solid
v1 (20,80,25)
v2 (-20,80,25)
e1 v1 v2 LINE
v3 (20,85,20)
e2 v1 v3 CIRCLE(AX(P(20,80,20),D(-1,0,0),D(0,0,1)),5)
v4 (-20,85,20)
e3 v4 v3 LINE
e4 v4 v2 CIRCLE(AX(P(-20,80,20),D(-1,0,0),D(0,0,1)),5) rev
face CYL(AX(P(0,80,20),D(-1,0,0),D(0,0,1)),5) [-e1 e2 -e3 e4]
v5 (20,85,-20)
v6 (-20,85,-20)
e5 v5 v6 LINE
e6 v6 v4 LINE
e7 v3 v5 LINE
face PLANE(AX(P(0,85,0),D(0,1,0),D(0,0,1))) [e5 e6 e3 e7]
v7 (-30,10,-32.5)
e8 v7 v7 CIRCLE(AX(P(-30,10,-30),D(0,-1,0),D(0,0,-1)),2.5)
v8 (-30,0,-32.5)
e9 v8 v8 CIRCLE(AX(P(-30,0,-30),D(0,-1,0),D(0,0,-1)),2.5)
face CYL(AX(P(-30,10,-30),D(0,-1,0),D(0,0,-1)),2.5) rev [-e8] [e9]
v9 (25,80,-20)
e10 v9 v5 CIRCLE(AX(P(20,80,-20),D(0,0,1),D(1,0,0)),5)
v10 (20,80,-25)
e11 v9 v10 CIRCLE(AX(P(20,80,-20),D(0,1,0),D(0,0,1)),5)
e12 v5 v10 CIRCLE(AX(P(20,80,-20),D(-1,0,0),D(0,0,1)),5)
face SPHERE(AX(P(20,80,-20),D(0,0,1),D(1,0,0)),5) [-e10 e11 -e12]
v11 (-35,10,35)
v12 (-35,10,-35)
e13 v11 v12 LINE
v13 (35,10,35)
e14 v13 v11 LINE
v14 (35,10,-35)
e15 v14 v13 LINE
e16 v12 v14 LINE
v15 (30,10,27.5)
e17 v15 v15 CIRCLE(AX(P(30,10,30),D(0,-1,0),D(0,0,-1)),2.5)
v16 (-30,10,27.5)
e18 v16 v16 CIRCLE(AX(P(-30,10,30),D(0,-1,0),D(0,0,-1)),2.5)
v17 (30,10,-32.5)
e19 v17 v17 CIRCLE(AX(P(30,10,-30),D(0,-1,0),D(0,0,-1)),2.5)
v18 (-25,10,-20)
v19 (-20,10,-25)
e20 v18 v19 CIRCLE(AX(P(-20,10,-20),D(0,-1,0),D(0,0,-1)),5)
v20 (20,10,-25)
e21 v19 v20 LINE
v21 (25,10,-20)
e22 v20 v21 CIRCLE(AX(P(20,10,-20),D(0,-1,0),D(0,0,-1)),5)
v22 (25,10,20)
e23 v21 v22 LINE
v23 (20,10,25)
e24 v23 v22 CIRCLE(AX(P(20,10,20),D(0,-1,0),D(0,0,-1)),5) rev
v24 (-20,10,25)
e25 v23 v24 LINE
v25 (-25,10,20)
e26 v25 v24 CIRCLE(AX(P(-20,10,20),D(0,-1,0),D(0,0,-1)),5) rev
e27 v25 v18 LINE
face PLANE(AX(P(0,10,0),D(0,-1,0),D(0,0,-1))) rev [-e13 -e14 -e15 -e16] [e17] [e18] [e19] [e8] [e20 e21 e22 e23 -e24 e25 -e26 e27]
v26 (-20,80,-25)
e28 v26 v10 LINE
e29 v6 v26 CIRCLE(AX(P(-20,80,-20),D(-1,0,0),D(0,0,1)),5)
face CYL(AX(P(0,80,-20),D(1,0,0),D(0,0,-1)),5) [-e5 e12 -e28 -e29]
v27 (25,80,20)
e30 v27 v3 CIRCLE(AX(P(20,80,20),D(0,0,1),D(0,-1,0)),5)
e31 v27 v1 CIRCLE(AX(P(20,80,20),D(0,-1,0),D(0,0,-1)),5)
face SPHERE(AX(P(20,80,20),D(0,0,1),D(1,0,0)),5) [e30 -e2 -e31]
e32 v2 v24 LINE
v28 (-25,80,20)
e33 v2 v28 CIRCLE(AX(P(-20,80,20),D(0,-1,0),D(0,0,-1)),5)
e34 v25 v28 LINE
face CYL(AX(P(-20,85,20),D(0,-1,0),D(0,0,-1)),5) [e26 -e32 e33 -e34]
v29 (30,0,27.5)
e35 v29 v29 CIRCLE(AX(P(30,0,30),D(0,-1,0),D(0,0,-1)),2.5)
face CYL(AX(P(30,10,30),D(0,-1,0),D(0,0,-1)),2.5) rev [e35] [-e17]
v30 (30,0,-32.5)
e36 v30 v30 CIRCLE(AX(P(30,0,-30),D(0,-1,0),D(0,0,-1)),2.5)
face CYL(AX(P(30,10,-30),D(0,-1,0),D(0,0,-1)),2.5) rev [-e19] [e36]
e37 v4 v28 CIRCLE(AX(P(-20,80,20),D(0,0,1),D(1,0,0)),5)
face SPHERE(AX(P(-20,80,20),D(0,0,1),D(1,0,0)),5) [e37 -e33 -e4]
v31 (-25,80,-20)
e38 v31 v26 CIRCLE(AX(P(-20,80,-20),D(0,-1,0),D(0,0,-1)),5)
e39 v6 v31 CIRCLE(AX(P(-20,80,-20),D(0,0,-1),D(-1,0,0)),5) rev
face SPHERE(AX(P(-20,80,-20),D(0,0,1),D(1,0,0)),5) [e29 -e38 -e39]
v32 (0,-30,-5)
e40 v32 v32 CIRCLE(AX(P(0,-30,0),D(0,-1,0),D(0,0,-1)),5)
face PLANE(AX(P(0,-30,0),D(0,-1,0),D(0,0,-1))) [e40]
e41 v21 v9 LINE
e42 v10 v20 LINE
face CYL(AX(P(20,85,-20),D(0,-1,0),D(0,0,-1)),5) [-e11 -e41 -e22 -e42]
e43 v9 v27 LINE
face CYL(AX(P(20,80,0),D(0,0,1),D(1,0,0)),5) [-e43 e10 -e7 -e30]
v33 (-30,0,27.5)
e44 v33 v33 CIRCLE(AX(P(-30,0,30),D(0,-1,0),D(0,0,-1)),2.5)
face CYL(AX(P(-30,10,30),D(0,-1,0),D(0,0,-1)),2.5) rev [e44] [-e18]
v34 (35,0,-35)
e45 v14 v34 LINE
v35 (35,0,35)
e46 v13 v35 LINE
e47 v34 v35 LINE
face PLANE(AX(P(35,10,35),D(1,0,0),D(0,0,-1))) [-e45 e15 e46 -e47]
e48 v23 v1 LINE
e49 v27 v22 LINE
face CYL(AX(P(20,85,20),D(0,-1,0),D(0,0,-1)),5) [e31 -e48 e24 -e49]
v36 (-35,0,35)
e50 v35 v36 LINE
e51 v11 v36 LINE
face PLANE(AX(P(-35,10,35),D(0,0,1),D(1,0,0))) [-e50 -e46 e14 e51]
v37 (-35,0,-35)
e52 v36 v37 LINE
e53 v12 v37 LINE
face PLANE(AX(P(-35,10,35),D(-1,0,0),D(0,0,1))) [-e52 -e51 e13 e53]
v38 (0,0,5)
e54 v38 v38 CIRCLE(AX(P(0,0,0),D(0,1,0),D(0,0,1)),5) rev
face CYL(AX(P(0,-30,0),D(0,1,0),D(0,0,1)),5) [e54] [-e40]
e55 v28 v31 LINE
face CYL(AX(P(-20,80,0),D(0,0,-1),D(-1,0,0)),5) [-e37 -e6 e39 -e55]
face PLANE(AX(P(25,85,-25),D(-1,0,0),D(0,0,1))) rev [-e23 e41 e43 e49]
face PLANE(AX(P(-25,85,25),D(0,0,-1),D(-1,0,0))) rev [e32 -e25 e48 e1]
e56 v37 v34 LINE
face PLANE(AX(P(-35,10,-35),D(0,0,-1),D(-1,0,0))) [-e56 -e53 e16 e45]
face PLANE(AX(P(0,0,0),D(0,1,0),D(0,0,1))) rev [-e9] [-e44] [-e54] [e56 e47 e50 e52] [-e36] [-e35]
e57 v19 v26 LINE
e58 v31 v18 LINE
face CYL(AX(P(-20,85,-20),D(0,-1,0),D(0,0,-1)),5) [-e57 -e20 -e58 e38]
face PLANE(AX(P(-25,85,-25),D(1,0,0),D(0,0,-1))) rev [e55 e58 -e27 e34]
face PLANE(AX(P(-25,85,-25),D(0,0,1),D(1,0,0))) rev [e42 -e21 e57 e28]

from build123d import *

# Parameters (mm, degrees)
SKETCH1_W           = 50
SKETCH1_H           = 50
BOSS_EXTRUDE1_DEPTH = 85
SKETCH2_R           = 5
BOSS_EXTRUDE2_DEPTH = 30
FILLET1_R           = 5
FILLET2_R           = 5
SKETCH3_W           = 70
SKETCH3_H           = 70
BOSS_EXTRUDE3_DEPTH = 10
FILLET3_R           = 5
SKETCH4_R           = 2.5
CUT_EXTRUDE1_DEPTH  = 10


with BuildPart() as part:
    # Sketch1 → Boss-Extrude1 (new body)
    with BuildSketch(Plane(origin=(0, 0, 0), x_dir=(1, 0, 0), z_dir=(0, 1, 0))):
        Rectangle(SKETCH1_W, SKETCH1_H)
    extrude(amount=BOSS_EXTRUDE1_DEPTH)

    # Sketch2 → Boss-Extrude2 (add)
    with BuildSketch(Plane.XZ):
        with Locations(Location((0, 0, 0), (0, 0, 90))):
            Circle(SKETCH2_R)
    extrude(amount=BOSS_EXTRUDE2_DEPTH)

    # Fillet1
    fillet1_edges = [part.edges().sort_by_distance(p)[0] for p in [
        (0, 85, 25),
        (0, 0, 25),
        (25, 42.5, 25),
        (-25, 42.5, 25),
    ]]
    fillet(fillet1_edges, radius=FILLET1_R)

    # Fillet2
    # the kernel refuses this fillet: 5 mm, written as the material it takes off along each edge
    with BuildSketch(Plane(origin=(-20, 80, 20), x_dir=(0, 1, 0), z_dir=(-1, 0, 0))) as fillet2_piece_1_section:
        Polygon((0, 0), (FILLET2_R, 0), (FILLET2_R, -FILLET2_R), (0, -FILLET2_R), align=None)
    fillet2_piece_1 = extrude(amount=FILLET2_R, mode=Mode.PRIVATE)
    fillet2_piece_1 = fillet2_piece_1 - Plane(origin=(-20, 80, 20), x_dir=(0, -0.7071067811865475, -0.7071067811865475), z_dir=(-1, 0, 0)) * Sphere(FILLET2_R, mode=Mode.PRIVATE)
    add(fillet2_piece_1, mode=Mode.SUBTRACT)
    with BuildSketch(Plane(origin=(20, 80, 20), x_dir=(1, 0, 0), z_dir=(0, 1, 0))) as fillet2_piece_2_section:
        Polygon((0, 0), (FILLET2_R, 0), (FILLET2_R, -FILLET2_R), (0, -FILLET2_R), align=None)
    fillet2_piece_2 = extrude(amount=FILLET2_R, mode=Mode.PRIVATE)
    fillet2_piece_2 = fillet2_piece_2 - Plane(origin=(20, 80, 20), x_dir=(-0.7071067811865475, 0, -0.7071067811865475), z_dir=(0, 1, 0)) * Sphere(FILLET2_R, mode=Mode.PRIVATE)
    add(fillet2_piece_2, mode=Mode.SUBTRACT)
    with BuildSketch(Plane(origin=(-20, 5, 20), x_dir=(0, -1, 0), z_dir=(-1, 0, 0))) as fillet2_piece_3_section:
        Polygon((0, 0), (FILLET2_R, 0), (FILLET2_R, FILLET2_R), (0, FILLET2_R), align=None)
    fillet2_piece_3 = extrude(amount=FILLET2_R, mode=Mode.PRIVATE)
    fillet2_piece_3 = fillet2_piece_3 - Plane(origin=(-20, 5, 20), x_dir=(0, 0.7071067811865475, -0.7071067811865475), z_dir=(-1, 0, 0)) * Sphere(FILLET2_R, mode=Mode.PRIVATE)
    add(fillet2_piece_3, mode=Mode.SUBTRACT)
    with BuildSketch(Plane(origin=(20, 5, 20), x_dir=(1, 0, 0), z_dir=(0, -1, 0))) as fillet2_piece_4_section:
        Polygon((0, 0), (FILLET2_R, 0), (FILLET2_R, FILLET2_R), (0, FILLET2_R), align=None)
    fillet2_piece_4 = extrude(amount=FILLET2_R, mode=Mode.PRIVATE)
    fillet2_piece_4 = fillet2_piece_4 - Plane(origin=(20, 5, 20), x_dir=(-0.7071067811865475, 0, -0.7071067811865475), z_dir=(0, -1, 0)) * Sphere(FILLET2_R, mode=Mode.PRIVATE)
    add(fillet2_piece_4, mode=Mode.SUBTRACT)
    with BuildSketch(Plane(origin=(-25, 85, 20), x_dir=(0, -1, 0), z_dir=(0, 0, -1)), Plane(origin=(25, 0, -37.5), x_dir=(-1, 0, 0), z_dir=(0, 0, 1))) as fillet2_piece_5:
        with BuildLine():
            CenterArc((FILLET2_R, -FILLET2_R), FILLET2_R, 90, 90)
            Line((0, -FILLET2_R), (0, 0))
            Line((0, 0), (FILLET2_R, 0))
        make_face()
    extrude(amount=57.5, mode=Mode.SUBTRACT)
    with BuildSketch(Plane(origin=(25, 85, -37.5), x_dir=(-1, 0, 0), z_dir=(0, 0, 1)), Plane(origin=(-25, 0, 20), x_dir=(0, 1, 0), z_dir=(0, 0, -1))) as fillet2_piece_6:
        with BuildLine():
            CenterArc((FILLET2_R, FILLET2_R), FILLET2_R, 180, 90)
            Line((0, FILLET2_R), (0, 0))
            Line((0, 0), (FILLET2_R, 0))
        make_face()
    extrude(amount=57.5, mode=Mode.SUBTRACT)

    # Sketch3 → Boss-Extrude3 (add)
    with BuildSketch(Plane.XZ):
        Rectangle(SKETCH3_W, SKETCH3_H)
    extrude(amount=-BOSS_EXTRUDE3_DEPTH)

    # Fillet3
    fillet3_edges = [part.edges().sort_by_distance(p)[0] for p in [
        (0, 85, -25),
        (-25, 45, -25),
        (25, 45, -25),
        (23.535533906, 83.535533906, -25),
        (-23.535533906, 83.535533906, -25),
    ]]
    fillet(fillet3_edges, radius=FILLET3_R)

    # Sketch4 → Cut-Extrude1 (cut)
    with BuildSketch(Plane.XZ):
        with Locations(Location((-30, 30, 0), (0, 0, 270))):
            Circle(SKETCH4_R)
        with Locations(Location((30, 30, 0), (0, 0, 270))):
            Circle(SKETCH4_R)
        with Locations(Location((30, -30, 0), (0, 0, 270))):
            Circle(SKETCH4_R)
        with Locations(Location((-30, -30, 0), (0, 0, 270))):
            Circle(SKETCH4_R)
    extrude(amount=-CUT_EXTRUDE1_DEPTH, mode=Mode.SUBTRACT)


solid = part.part
